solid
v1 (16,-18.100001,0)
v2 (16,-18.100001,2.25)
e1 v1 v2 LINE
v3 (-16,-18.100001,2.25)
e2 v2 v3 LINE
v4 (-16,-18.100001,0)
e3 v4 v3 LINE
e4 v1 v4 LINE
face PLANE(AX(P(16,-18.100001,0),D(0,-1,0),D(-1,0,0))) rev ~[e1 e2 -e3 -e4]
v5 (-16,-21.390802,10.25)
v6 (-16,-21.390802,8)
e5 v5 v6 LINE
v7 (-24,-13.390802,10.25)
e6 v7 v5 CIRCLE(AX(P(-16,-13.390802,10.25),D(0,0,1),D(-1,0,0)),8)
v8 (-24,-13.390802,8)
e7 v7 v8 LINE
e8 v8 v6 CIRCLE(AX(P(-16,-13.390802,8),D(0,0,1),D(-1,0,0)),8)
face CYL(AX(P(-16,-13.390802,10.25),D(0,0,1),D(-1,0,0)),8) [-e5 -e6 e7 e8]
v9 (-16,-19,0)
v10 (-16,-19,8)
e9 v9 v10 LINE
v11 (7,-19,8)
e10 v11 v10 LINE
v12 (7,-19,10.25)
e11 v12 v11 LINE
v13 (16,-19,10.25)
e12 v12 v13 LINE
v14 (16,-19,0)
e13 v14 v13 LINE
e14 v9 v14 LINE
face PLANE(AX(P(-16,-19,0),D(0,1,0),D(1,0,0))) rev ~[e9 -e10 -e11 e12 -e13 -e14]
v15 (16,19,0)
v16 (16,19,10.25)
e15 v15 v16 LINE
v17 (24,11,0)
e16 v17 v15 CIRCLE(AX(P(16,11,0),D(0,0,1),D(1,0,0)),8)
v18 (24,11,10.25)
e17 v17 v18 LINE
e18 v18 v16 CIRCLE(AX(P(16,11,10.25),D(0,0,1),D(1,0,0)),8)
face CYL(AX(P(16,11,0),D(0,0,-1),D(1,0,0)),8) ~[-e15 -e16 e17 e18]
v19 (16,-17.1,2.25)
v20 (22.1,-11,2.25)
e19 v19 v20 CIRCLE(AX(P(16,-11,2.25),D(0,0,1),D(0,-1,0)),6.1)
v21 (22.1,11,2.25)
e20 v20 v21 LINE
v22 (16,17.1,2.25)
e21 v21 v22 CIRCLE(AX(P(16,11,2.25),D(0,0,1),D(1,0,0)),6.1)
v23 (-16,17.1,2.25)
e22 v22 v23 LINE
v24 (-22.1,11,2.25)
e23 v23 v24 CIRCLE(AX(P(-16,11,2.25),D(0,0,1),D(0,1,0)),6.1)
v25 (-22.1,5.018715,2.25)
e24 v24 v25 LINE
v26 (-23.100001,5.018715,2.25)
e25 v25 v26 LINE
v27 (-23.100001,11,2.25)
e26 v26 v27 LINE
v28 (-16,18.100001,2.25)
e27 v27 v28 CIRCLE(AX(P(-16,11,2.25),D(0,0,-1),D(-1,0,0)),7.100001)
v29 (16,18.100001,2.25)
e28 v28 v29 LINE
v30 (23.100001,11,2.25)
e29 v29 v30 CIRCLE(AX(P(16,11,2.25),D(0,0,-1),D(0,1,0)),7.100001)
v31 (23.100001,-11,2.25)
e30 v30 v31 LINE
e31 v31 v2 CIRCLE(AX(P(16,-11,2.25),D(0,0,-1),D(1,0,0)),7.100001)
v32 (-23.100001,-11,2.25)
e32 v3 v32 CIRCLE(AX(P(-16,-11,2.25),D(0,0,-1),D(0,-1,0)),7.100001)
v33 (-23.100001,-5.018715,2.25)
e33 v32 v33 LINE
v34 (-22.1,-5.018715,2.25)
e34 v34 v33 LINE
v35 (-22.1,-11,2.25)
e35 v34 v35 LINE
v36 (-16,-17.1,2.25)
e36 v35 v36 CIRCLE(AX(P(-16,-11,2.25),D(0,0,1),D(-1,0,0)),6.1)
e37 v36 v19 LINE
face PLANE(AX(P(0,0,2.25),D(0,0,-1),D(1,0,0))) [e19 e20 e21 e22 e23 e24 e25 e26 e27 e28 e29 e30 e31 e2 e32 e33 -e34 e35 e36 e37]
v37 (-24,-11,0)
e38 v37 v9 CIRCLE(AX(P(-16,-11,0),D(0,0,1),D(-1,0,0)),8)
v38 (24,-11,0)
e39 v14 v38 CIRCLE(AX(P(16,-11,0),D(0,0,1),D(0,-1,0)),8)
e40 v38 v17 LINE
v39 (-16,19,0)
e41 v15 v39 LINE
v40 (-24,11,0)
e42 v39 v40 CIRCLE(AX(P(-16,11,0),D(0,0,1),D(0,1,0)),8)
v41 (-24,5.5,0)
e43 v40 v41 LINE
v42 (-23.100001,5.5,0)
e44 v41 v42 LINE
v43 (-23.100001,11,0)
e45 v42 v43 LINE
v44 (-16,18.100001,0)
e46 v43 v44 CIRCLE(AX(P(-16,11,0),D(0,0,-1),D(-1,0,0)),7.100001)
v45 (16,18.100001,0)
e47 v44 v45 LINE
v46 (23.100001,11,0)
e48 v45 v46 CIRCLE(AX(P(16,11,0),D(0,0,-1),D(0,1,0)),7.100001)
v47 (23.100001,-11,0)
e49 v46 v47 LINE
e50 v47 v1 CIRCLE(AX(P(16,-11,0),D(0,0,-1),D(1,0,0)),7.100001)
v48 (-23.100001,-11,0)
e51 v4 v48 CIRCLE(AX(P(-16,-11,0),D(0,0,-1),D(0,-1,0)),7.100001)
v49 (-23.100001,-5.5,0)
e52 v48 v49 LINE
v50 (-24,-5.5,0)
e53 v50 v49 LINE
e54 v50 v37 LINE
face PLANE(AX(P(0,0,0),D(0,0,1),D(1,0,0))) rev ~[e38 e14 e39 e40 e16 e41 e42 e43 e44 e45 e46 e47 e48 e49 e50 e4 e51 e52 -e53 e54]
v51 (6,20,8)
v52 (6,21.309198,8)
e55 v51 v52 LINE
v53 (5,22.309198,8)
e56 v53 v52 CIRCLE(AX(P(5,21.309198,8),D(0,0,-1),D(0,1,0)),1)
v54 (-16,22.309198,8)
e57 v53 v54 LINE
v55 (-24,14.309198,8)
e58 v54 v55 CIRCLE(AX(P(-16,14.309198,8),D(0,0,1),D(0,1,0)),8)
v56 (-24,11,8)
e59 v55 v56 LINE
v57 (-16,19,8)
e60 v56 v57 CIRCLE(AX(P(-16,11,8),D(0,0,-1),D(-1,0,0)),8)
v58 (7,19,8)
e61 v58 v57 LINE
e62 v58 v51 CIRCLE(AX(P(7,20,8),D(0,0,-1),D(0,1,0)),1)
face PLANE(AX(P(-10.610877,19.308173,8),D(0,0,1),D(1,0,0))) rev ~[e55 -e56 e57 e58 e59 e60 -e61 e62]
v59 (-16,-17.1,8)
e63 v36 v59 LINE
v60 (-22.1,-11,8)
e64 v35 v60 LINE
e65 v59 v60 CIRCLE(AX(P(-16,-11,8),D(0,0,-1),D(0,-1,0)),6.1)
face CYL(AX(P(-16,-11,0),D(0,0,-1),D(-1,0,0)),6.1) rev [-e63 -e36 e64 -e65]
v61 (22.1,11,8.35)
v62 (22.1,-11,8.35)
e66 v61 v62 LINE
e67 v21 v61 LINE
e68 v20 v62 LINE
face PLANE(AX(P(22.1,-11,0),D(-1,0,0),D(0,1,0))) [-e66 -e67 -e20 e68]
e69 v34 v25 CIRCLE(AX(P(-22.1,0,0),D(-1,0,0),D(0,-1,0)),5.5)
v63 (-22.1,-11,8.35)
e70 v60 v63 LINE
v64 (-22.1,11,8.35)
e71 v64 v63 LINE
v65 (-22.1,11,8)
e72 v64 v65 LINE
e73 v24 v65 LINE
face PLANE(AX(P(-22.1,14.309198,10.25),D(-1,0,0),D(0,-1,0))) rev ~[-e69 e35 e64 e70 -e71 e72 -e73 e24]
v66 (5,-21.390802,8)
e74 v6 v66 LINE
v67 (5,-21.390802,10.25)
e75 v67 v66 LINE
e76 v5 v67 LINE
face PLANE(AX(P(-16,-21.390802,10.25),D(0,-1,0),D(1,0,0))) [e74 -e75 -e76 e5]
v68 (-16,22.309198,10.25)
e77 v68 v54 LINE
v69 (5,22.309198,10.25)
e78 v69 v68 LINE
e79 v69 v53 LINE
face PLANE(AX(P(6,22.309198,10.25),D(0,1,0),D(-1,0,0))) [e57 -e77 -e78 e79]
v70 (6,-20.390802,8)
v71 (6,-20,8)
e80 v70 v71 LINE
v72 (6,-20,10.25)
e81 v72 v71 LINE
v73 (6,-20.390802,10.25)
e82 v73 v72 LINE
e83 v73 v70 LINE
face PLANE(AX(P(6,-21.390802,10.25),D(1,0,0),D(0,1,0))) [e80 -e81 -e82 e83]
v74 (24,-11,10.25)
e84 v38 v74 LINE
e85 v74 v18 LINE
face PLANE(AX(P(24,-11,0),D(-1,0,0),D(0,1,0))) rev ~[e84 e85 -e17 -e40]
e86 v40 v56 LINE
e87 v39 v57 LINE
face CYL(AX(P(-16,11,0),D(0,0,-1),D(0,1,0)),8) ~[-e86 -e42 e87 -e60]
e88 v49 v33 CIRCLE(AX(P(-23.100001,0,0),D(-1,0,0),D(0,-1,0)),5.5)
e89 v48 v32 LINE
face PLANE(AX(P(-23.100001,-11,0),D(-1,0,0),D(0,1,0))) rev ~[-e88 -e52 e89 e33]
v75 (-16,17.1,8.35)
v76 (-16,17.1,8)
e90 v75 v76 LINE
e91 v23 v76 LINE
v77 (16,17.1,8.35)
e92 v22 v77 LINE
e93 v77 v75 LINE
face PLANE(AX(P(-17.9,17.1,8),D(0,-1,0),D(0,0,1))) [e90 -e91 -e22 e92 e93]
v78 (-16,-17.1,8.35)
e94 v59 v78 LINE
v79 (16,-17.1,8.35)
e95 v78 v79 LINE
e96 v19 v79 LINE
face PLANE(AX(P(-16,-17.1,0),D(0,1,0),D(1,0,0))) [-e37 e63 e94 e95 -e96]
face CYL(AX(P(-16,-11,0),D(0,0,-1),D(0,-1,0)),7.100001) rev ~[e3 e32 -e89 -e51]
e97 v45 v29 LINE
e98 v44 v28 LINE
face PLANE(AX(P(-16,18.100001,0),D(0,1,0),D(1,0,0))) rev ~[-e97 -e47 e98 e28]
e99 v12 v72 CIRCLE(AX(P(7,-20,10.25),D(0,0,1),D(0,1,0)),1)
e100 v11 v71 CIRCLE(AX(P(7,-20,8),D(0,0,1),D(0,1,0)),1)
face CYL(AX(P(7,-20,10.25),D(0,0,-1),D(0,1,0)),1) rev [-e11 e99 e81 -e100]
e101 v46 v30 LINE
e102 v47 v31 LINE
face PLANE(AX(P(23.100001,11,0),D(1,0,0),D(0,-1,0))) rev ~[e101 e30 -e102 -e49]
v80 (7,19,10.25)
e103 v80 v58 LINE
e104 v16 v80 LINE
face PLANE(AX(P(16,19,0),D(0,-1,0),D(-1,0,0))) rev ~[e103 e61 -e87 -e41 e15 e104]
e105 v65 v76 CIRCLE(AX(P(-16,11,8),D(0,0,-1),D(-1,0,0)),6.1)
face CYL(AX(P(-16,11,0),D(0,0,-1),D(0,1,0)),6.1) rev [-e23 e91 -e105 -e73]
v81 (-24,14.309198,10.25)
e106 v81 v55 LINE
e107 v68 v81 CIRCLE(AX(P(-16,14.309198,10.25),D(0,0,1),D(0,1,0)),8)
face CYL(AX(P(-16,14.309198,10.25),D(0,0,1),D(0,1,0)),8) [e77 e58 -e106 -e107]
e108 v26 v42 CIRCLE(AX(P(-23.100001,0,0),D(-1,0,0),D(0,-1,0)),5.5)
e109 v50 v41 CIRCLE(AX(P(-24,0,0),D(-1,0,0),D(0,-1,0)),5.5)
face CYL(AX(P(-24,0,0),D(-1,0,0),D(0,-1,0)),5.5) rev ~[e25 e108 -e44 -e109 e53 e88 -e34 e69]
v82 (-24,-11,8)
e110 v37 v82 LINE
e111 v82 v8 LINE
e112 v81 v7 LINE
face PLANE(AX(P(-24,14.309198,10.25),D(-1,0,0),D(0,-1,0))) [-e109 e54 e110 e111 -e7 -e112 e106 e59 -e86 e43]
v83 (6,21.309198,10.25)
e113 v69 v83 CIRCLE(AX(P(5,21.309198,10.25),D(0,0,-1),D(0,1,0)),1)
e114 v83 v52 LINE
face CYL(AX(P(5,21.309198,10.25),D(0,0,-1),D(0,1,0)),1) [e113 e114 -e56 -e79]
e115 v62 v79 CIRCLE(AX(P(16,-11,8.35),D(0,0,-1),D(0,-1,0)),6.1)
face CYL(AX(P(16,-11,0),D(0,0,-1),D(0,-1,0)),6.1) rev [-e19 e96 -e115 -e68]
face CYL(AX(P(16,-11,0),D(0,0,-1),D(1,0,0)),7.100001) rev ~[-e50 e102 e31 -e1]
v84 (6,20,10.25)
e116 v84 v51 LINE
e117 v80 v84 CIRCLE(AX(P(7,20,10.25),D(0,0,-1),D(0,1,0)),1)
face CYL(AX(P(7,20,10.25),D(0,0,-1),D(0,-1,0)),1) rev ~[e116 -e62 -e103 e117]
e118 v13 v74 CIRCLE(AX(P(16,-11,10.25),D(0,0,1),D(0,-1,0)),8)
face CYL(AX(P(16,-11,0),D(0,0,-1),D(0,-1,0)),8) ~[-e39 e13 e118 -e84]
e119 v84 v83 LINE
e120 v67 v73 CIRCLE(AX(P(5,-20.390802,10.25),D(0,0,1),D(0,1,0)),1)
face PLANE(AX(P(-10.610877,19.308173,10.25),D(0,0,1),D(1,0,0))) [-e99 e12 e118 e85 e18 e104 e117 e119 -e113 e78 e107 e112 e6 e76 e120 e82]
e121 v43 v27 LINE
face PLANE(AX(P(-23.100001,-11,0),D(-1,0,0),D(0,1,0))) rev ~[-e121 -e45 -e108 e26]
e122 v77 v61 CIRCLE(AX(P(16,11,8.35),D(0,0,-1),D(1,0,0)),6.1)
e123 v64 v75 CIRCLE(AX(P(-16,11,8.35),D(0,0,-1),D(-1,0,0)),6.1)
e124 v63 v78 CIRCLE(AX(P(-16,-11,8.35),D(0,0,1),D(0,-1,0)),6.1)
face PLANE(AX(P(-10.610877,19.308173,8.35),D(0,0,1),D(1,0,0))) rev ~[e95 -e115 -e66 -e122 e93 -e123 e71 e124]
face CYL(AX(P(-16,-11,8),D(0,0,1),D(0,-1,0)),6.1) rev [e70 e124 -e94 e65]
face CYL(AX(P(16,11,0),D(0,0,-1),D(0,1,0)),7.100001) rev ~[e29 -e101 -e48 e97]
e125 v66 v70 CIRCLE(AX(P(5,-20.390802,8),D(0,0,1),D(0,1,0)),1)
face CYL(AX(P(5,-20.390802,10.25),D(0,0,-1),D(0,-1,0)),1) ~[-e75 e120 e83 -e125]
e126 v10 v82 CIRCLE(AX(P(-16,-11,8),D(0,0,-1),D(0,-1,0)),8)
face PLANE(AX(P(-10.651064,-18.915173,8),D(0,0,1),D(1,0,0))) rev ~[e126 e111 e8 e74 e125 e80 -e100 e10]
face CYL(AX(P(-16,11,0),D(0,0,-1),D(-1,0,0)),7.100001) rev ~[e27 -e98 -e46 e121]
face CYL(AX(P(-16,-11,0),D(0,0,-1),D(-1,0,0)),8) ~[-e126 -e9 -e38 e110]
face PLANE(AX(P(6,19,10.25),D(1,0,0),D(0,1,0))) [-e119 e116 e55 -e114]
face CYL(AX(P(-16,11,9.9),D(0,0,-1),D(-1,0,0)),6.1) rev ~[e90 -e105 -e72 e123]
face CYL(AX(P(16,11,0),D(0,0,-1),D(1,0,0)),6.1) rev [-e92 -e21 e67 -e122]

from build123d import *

# Parameters (mm, degrees)
F1_DEPTH     = 10.25
F3_DEPTH     = 2.25
F4_R         = 1
F5_T         = 1.9
F5_T3_DEPTH  = 4.8
F5_T5_DEPTH  = 25.8
F5_T8_ANGLE  = 90.000000001
F5_T10_ANGLE = 90.000000001
F7_DEPTH     = 2.25
F9_DEPTH     = 6.4


# Not quite as in the source:
# - a shell that OpenCascade refuses in one call is made with other operations: the cavity is built on its own and cut out


with BuildPart() as f1:
    # F0 (on Top) → F1 (new body)
    with BuildSketch(Plane.XY):
        with BuildLine():
            Line((16, 19), (-16, 19))
            ThreePointArc((-16, 19), (-21.6568542495, 16.6568542495), (-24, 11))
            Line((-24, 11), (-24, -11))
            ThreePointArc((-24, -11), (-21.6568542495, -16.6568542495), (-16, -19))
            Line((-16, -19), (16, -19))
            ThreePointArc((16, -19), (21.6568542495, -16.6568542495), (24, -11))
            Line((24, -11), (24, 11))
            ThreePointArc((24, 11), (21.6568542495, 16.6568542495), (16, 19))
        make_face()
    extrude(amount=F1_DEPTH)

    # F2 (on face) → F3 (join)
    with BuildSketch(Plane.XY.offset(10.25)):
        with BuildLine():
            Line((6, 22.309198174), (-16, 22.309198174))
            ThreePointArc((-16, 22.309198174), (-21.6568542495, 19.9660524235), (-24, 14.309198174))
            Line((-24, 14.309198174), (-24, 11))
            ThreePointArc((-24, 11), (-21.6568542495, 16.6568542495), (-16, 19))
            Line((-16, 19), (6, 19))
            Line((6, 19), (6, 22.309198174))
        make_face()
        with BuildLine():
            Line((6, -21.390801826), (6, -19))
            Line((6, -19), (-16, -19))
            ThreePointArc((-16, -19), (-21.6568542495, -16.6568542495), (-24, -11))
            Line((-24, -11), (-24, -13.390801826))
            ThreePointArc((-24, -13.390801826), (-21.6568542495, -19.0476560755), (-16, -21.390801826))
            Line((-16, -21.390801826), (6, -21.390801826))
        make_face()
    extrude(amount=-F3_DEPTH)

    # F4
    f4_edges = [f1.edges().sort_by_distance(p)[0] for p in [
        (6, -21.390802, 9.125),
        (6, -19, 9.125),
        (6, 19, 9.125),
        (6, 22.309198, 9.125),
    ]]
    fillet(f4_edges, radius=F4_R)

    # F5: shell of thickness 1.9, made by hand


with BuildPart() as f5_core1:
    # F5_t2: copy of F1
    add(f1.part)

    # the walls: a layer under each face that stays
    f5_faces = [f5_core1.faces().sort_by_distance(p)[0] for p in [
        (0, 19, 5.125),
        (0, 0.459198174, 10.25),
        (6.2928932188, 19.2928932188, 9.125),
        (21.6568542495, 16.6568542495, 5.125),
        (-18.8333333333, 20.4243318117, 8),
        (-21.6568542495, 16.6568542495, 4),
        (6, 20.654599087, 9.125),
        (24, 0, 5.125),
        (21.6568542495, -16.6568542495, 5.125),
        (-5.5, 22.309198174, 9.125),
        (0, -19, 5.125),
        (-21.6568542495, 19.9660524235, 9.125),
        (6.2928932188, -19.2928932188, 9.125),
        (-24, 0.459198174, 5.125),
        (6, -20.195400913, 9.125),
        (-21.6568542495, -19.0476560755, 9.125),
        (-5.5, -21.390801826, 9.125),
        (-21.6568542495, -16.6568542495, 4),
        (-18.8333333333, -19.6590015216, 8),
    ]]
    thicken(f5_faces, amount=-F5_T, mode=Mode.SUBTRACT)

    # F5_s4 → F5_t3 (cut)
    with BuildSketch(Plane.YZ.offset(4.1)):
        Polygon((19.019, 7.981), (17.1, 8), (17.1, 9.9), (19, 9.9), align=None)
        Polygon((-19.019, 7.981), (-17.1, 8), (-17.1, 9.9), (-19, 9.9), align=None)
    extrude(amount=F5_T3_DEPTH, mode=Mode.SUBTRACT)

    # F5_s6 → F5_t5 (cut)
    with BuildSketch(Plane.YZ.offset(-17.9)):
        Polygon((19.019, 7.981), (17.1, 8), (17.1, 9.9), (19, 9.9), align=None)
        Polygon((-19.019, 7.981), (-17.1, 8), (-17.1, 9.9), (-19, 9.9), align=None)
    extrude(amount=F5_T5_DEPTH, mode=Mode.SUBTRACT)

    # F5_s7 → F5_t8 (revolve, cut)
    with BuildSketch(Plane.XZ.offset(-11)):
        Polygon((-24.019, 7.981), (-24, 9.9), (-22.1, 9.9), (-22.1, 8), align=None)
    revolve(axis=Axis((-16, 11, 8), (0, 0, -1)), revolution_arc=F5_T8_ANGLE, mode=Mode.SUBTRACT)

    # F5_s9 → F5_t10 (revolve, cut)
    with BuildSketch(Plane.YZ.offset(-16)):
        Polygon((-19.019, 7.981), (-17.1, 8), (-17.1, 9.9), (-19, 9.9), align=None)
    revolve(axis=Axis((-16, -11, 8), (0, 0, -1)), revolution_arc=F5_T10_ANGLE, mode=Mode.SUBTRACT)


with BuildPart() as f1_1:
    add(f1.part)

    # what is left inside the walls is the cavity
    f5_cavity = [f5_core1.part.solids().sort_by_distance(p)[0] for p in [
        (0, -5.7, 0.019),
    ]]
    add(f5_cavity, mode=Mode.SUBTRACT)

    # F6 (on face) → F7 (cut)
    with BuildSketch(Plane(origin=(0, 0, 0), x_dir=(1, 0, 0), z_dir=(0, 0, -1))):
        with BuildLine():
            ThreePointArc((-16, 18.1000009179), (-21.0204587955, 16.0204587955), (-23.1000009179, 11))
            Line((-23.1000009179, 11), (-23.1000009179, -11))
            ThreePointArc((-23.1000009179, -11), (-21.0204587955, -16.0204587955), (-16, -18.1000009179))
            Line((-16, -18.1000009179), (16, -18.1000009179))
            ThreePointArc((16, -18.1000009179), (21.0204587955, -16.0204587955), (23.1000009179, -11))
            Line((23.1000009179, -11), (23.1000009179, 11))
            ThreePointArc((23.1000009179, 11), (21.0204587955, 16.0204587955), (16, 18.1000009179))
            Line((16, 18.1000009179), (-16, 18.1000009179))
        make_face()
        with BuildLine():
            Line((16, -17.1), (-16, -17.1))
            ThreePointArc((-16, -17.1), (-20.3133513652, -15.3133513652), (-22.1, -11))
            Line((-22.1, -11), (-22.1, 11))
            ThreePointArc((-22.1, 11), (-20.3133513652, 15.3133513652), (-16, 17.1))
            Line((-16, 17.1), (16, 17.1))
            ThreePointArc((16, 17.1), (20.3133513652, 15.3133513652), (22.1, 11))
            Line((22.1, 11), (22.1, -11))
            ThreePointArc((22.1, -11), (20.3133513652, -15.3133513652), (16, -17.1))
        make_face(mode=Mode.SUBTRACT)
    extrude(amount=-F7_DEPTH, mode=Mode.SUBTRACT)

    # F8 (on face) → F9 (cut)
    with BuildSketch(Plane(origin=(-24, 0, 0), x_dir=(0, -1, 0), z_dir=(-1, 0, 0))):
        with BuildLine():
            Line((-5.5, 0), (5.5, 0))
            ThreePointArc((5.5, 0), (0, 5.5), (-5.5, 0))
        make_face()
    extrude(amount=-F9_DEPTH, mode=Mode.SUBTRACT)


solid = f1_1.part
